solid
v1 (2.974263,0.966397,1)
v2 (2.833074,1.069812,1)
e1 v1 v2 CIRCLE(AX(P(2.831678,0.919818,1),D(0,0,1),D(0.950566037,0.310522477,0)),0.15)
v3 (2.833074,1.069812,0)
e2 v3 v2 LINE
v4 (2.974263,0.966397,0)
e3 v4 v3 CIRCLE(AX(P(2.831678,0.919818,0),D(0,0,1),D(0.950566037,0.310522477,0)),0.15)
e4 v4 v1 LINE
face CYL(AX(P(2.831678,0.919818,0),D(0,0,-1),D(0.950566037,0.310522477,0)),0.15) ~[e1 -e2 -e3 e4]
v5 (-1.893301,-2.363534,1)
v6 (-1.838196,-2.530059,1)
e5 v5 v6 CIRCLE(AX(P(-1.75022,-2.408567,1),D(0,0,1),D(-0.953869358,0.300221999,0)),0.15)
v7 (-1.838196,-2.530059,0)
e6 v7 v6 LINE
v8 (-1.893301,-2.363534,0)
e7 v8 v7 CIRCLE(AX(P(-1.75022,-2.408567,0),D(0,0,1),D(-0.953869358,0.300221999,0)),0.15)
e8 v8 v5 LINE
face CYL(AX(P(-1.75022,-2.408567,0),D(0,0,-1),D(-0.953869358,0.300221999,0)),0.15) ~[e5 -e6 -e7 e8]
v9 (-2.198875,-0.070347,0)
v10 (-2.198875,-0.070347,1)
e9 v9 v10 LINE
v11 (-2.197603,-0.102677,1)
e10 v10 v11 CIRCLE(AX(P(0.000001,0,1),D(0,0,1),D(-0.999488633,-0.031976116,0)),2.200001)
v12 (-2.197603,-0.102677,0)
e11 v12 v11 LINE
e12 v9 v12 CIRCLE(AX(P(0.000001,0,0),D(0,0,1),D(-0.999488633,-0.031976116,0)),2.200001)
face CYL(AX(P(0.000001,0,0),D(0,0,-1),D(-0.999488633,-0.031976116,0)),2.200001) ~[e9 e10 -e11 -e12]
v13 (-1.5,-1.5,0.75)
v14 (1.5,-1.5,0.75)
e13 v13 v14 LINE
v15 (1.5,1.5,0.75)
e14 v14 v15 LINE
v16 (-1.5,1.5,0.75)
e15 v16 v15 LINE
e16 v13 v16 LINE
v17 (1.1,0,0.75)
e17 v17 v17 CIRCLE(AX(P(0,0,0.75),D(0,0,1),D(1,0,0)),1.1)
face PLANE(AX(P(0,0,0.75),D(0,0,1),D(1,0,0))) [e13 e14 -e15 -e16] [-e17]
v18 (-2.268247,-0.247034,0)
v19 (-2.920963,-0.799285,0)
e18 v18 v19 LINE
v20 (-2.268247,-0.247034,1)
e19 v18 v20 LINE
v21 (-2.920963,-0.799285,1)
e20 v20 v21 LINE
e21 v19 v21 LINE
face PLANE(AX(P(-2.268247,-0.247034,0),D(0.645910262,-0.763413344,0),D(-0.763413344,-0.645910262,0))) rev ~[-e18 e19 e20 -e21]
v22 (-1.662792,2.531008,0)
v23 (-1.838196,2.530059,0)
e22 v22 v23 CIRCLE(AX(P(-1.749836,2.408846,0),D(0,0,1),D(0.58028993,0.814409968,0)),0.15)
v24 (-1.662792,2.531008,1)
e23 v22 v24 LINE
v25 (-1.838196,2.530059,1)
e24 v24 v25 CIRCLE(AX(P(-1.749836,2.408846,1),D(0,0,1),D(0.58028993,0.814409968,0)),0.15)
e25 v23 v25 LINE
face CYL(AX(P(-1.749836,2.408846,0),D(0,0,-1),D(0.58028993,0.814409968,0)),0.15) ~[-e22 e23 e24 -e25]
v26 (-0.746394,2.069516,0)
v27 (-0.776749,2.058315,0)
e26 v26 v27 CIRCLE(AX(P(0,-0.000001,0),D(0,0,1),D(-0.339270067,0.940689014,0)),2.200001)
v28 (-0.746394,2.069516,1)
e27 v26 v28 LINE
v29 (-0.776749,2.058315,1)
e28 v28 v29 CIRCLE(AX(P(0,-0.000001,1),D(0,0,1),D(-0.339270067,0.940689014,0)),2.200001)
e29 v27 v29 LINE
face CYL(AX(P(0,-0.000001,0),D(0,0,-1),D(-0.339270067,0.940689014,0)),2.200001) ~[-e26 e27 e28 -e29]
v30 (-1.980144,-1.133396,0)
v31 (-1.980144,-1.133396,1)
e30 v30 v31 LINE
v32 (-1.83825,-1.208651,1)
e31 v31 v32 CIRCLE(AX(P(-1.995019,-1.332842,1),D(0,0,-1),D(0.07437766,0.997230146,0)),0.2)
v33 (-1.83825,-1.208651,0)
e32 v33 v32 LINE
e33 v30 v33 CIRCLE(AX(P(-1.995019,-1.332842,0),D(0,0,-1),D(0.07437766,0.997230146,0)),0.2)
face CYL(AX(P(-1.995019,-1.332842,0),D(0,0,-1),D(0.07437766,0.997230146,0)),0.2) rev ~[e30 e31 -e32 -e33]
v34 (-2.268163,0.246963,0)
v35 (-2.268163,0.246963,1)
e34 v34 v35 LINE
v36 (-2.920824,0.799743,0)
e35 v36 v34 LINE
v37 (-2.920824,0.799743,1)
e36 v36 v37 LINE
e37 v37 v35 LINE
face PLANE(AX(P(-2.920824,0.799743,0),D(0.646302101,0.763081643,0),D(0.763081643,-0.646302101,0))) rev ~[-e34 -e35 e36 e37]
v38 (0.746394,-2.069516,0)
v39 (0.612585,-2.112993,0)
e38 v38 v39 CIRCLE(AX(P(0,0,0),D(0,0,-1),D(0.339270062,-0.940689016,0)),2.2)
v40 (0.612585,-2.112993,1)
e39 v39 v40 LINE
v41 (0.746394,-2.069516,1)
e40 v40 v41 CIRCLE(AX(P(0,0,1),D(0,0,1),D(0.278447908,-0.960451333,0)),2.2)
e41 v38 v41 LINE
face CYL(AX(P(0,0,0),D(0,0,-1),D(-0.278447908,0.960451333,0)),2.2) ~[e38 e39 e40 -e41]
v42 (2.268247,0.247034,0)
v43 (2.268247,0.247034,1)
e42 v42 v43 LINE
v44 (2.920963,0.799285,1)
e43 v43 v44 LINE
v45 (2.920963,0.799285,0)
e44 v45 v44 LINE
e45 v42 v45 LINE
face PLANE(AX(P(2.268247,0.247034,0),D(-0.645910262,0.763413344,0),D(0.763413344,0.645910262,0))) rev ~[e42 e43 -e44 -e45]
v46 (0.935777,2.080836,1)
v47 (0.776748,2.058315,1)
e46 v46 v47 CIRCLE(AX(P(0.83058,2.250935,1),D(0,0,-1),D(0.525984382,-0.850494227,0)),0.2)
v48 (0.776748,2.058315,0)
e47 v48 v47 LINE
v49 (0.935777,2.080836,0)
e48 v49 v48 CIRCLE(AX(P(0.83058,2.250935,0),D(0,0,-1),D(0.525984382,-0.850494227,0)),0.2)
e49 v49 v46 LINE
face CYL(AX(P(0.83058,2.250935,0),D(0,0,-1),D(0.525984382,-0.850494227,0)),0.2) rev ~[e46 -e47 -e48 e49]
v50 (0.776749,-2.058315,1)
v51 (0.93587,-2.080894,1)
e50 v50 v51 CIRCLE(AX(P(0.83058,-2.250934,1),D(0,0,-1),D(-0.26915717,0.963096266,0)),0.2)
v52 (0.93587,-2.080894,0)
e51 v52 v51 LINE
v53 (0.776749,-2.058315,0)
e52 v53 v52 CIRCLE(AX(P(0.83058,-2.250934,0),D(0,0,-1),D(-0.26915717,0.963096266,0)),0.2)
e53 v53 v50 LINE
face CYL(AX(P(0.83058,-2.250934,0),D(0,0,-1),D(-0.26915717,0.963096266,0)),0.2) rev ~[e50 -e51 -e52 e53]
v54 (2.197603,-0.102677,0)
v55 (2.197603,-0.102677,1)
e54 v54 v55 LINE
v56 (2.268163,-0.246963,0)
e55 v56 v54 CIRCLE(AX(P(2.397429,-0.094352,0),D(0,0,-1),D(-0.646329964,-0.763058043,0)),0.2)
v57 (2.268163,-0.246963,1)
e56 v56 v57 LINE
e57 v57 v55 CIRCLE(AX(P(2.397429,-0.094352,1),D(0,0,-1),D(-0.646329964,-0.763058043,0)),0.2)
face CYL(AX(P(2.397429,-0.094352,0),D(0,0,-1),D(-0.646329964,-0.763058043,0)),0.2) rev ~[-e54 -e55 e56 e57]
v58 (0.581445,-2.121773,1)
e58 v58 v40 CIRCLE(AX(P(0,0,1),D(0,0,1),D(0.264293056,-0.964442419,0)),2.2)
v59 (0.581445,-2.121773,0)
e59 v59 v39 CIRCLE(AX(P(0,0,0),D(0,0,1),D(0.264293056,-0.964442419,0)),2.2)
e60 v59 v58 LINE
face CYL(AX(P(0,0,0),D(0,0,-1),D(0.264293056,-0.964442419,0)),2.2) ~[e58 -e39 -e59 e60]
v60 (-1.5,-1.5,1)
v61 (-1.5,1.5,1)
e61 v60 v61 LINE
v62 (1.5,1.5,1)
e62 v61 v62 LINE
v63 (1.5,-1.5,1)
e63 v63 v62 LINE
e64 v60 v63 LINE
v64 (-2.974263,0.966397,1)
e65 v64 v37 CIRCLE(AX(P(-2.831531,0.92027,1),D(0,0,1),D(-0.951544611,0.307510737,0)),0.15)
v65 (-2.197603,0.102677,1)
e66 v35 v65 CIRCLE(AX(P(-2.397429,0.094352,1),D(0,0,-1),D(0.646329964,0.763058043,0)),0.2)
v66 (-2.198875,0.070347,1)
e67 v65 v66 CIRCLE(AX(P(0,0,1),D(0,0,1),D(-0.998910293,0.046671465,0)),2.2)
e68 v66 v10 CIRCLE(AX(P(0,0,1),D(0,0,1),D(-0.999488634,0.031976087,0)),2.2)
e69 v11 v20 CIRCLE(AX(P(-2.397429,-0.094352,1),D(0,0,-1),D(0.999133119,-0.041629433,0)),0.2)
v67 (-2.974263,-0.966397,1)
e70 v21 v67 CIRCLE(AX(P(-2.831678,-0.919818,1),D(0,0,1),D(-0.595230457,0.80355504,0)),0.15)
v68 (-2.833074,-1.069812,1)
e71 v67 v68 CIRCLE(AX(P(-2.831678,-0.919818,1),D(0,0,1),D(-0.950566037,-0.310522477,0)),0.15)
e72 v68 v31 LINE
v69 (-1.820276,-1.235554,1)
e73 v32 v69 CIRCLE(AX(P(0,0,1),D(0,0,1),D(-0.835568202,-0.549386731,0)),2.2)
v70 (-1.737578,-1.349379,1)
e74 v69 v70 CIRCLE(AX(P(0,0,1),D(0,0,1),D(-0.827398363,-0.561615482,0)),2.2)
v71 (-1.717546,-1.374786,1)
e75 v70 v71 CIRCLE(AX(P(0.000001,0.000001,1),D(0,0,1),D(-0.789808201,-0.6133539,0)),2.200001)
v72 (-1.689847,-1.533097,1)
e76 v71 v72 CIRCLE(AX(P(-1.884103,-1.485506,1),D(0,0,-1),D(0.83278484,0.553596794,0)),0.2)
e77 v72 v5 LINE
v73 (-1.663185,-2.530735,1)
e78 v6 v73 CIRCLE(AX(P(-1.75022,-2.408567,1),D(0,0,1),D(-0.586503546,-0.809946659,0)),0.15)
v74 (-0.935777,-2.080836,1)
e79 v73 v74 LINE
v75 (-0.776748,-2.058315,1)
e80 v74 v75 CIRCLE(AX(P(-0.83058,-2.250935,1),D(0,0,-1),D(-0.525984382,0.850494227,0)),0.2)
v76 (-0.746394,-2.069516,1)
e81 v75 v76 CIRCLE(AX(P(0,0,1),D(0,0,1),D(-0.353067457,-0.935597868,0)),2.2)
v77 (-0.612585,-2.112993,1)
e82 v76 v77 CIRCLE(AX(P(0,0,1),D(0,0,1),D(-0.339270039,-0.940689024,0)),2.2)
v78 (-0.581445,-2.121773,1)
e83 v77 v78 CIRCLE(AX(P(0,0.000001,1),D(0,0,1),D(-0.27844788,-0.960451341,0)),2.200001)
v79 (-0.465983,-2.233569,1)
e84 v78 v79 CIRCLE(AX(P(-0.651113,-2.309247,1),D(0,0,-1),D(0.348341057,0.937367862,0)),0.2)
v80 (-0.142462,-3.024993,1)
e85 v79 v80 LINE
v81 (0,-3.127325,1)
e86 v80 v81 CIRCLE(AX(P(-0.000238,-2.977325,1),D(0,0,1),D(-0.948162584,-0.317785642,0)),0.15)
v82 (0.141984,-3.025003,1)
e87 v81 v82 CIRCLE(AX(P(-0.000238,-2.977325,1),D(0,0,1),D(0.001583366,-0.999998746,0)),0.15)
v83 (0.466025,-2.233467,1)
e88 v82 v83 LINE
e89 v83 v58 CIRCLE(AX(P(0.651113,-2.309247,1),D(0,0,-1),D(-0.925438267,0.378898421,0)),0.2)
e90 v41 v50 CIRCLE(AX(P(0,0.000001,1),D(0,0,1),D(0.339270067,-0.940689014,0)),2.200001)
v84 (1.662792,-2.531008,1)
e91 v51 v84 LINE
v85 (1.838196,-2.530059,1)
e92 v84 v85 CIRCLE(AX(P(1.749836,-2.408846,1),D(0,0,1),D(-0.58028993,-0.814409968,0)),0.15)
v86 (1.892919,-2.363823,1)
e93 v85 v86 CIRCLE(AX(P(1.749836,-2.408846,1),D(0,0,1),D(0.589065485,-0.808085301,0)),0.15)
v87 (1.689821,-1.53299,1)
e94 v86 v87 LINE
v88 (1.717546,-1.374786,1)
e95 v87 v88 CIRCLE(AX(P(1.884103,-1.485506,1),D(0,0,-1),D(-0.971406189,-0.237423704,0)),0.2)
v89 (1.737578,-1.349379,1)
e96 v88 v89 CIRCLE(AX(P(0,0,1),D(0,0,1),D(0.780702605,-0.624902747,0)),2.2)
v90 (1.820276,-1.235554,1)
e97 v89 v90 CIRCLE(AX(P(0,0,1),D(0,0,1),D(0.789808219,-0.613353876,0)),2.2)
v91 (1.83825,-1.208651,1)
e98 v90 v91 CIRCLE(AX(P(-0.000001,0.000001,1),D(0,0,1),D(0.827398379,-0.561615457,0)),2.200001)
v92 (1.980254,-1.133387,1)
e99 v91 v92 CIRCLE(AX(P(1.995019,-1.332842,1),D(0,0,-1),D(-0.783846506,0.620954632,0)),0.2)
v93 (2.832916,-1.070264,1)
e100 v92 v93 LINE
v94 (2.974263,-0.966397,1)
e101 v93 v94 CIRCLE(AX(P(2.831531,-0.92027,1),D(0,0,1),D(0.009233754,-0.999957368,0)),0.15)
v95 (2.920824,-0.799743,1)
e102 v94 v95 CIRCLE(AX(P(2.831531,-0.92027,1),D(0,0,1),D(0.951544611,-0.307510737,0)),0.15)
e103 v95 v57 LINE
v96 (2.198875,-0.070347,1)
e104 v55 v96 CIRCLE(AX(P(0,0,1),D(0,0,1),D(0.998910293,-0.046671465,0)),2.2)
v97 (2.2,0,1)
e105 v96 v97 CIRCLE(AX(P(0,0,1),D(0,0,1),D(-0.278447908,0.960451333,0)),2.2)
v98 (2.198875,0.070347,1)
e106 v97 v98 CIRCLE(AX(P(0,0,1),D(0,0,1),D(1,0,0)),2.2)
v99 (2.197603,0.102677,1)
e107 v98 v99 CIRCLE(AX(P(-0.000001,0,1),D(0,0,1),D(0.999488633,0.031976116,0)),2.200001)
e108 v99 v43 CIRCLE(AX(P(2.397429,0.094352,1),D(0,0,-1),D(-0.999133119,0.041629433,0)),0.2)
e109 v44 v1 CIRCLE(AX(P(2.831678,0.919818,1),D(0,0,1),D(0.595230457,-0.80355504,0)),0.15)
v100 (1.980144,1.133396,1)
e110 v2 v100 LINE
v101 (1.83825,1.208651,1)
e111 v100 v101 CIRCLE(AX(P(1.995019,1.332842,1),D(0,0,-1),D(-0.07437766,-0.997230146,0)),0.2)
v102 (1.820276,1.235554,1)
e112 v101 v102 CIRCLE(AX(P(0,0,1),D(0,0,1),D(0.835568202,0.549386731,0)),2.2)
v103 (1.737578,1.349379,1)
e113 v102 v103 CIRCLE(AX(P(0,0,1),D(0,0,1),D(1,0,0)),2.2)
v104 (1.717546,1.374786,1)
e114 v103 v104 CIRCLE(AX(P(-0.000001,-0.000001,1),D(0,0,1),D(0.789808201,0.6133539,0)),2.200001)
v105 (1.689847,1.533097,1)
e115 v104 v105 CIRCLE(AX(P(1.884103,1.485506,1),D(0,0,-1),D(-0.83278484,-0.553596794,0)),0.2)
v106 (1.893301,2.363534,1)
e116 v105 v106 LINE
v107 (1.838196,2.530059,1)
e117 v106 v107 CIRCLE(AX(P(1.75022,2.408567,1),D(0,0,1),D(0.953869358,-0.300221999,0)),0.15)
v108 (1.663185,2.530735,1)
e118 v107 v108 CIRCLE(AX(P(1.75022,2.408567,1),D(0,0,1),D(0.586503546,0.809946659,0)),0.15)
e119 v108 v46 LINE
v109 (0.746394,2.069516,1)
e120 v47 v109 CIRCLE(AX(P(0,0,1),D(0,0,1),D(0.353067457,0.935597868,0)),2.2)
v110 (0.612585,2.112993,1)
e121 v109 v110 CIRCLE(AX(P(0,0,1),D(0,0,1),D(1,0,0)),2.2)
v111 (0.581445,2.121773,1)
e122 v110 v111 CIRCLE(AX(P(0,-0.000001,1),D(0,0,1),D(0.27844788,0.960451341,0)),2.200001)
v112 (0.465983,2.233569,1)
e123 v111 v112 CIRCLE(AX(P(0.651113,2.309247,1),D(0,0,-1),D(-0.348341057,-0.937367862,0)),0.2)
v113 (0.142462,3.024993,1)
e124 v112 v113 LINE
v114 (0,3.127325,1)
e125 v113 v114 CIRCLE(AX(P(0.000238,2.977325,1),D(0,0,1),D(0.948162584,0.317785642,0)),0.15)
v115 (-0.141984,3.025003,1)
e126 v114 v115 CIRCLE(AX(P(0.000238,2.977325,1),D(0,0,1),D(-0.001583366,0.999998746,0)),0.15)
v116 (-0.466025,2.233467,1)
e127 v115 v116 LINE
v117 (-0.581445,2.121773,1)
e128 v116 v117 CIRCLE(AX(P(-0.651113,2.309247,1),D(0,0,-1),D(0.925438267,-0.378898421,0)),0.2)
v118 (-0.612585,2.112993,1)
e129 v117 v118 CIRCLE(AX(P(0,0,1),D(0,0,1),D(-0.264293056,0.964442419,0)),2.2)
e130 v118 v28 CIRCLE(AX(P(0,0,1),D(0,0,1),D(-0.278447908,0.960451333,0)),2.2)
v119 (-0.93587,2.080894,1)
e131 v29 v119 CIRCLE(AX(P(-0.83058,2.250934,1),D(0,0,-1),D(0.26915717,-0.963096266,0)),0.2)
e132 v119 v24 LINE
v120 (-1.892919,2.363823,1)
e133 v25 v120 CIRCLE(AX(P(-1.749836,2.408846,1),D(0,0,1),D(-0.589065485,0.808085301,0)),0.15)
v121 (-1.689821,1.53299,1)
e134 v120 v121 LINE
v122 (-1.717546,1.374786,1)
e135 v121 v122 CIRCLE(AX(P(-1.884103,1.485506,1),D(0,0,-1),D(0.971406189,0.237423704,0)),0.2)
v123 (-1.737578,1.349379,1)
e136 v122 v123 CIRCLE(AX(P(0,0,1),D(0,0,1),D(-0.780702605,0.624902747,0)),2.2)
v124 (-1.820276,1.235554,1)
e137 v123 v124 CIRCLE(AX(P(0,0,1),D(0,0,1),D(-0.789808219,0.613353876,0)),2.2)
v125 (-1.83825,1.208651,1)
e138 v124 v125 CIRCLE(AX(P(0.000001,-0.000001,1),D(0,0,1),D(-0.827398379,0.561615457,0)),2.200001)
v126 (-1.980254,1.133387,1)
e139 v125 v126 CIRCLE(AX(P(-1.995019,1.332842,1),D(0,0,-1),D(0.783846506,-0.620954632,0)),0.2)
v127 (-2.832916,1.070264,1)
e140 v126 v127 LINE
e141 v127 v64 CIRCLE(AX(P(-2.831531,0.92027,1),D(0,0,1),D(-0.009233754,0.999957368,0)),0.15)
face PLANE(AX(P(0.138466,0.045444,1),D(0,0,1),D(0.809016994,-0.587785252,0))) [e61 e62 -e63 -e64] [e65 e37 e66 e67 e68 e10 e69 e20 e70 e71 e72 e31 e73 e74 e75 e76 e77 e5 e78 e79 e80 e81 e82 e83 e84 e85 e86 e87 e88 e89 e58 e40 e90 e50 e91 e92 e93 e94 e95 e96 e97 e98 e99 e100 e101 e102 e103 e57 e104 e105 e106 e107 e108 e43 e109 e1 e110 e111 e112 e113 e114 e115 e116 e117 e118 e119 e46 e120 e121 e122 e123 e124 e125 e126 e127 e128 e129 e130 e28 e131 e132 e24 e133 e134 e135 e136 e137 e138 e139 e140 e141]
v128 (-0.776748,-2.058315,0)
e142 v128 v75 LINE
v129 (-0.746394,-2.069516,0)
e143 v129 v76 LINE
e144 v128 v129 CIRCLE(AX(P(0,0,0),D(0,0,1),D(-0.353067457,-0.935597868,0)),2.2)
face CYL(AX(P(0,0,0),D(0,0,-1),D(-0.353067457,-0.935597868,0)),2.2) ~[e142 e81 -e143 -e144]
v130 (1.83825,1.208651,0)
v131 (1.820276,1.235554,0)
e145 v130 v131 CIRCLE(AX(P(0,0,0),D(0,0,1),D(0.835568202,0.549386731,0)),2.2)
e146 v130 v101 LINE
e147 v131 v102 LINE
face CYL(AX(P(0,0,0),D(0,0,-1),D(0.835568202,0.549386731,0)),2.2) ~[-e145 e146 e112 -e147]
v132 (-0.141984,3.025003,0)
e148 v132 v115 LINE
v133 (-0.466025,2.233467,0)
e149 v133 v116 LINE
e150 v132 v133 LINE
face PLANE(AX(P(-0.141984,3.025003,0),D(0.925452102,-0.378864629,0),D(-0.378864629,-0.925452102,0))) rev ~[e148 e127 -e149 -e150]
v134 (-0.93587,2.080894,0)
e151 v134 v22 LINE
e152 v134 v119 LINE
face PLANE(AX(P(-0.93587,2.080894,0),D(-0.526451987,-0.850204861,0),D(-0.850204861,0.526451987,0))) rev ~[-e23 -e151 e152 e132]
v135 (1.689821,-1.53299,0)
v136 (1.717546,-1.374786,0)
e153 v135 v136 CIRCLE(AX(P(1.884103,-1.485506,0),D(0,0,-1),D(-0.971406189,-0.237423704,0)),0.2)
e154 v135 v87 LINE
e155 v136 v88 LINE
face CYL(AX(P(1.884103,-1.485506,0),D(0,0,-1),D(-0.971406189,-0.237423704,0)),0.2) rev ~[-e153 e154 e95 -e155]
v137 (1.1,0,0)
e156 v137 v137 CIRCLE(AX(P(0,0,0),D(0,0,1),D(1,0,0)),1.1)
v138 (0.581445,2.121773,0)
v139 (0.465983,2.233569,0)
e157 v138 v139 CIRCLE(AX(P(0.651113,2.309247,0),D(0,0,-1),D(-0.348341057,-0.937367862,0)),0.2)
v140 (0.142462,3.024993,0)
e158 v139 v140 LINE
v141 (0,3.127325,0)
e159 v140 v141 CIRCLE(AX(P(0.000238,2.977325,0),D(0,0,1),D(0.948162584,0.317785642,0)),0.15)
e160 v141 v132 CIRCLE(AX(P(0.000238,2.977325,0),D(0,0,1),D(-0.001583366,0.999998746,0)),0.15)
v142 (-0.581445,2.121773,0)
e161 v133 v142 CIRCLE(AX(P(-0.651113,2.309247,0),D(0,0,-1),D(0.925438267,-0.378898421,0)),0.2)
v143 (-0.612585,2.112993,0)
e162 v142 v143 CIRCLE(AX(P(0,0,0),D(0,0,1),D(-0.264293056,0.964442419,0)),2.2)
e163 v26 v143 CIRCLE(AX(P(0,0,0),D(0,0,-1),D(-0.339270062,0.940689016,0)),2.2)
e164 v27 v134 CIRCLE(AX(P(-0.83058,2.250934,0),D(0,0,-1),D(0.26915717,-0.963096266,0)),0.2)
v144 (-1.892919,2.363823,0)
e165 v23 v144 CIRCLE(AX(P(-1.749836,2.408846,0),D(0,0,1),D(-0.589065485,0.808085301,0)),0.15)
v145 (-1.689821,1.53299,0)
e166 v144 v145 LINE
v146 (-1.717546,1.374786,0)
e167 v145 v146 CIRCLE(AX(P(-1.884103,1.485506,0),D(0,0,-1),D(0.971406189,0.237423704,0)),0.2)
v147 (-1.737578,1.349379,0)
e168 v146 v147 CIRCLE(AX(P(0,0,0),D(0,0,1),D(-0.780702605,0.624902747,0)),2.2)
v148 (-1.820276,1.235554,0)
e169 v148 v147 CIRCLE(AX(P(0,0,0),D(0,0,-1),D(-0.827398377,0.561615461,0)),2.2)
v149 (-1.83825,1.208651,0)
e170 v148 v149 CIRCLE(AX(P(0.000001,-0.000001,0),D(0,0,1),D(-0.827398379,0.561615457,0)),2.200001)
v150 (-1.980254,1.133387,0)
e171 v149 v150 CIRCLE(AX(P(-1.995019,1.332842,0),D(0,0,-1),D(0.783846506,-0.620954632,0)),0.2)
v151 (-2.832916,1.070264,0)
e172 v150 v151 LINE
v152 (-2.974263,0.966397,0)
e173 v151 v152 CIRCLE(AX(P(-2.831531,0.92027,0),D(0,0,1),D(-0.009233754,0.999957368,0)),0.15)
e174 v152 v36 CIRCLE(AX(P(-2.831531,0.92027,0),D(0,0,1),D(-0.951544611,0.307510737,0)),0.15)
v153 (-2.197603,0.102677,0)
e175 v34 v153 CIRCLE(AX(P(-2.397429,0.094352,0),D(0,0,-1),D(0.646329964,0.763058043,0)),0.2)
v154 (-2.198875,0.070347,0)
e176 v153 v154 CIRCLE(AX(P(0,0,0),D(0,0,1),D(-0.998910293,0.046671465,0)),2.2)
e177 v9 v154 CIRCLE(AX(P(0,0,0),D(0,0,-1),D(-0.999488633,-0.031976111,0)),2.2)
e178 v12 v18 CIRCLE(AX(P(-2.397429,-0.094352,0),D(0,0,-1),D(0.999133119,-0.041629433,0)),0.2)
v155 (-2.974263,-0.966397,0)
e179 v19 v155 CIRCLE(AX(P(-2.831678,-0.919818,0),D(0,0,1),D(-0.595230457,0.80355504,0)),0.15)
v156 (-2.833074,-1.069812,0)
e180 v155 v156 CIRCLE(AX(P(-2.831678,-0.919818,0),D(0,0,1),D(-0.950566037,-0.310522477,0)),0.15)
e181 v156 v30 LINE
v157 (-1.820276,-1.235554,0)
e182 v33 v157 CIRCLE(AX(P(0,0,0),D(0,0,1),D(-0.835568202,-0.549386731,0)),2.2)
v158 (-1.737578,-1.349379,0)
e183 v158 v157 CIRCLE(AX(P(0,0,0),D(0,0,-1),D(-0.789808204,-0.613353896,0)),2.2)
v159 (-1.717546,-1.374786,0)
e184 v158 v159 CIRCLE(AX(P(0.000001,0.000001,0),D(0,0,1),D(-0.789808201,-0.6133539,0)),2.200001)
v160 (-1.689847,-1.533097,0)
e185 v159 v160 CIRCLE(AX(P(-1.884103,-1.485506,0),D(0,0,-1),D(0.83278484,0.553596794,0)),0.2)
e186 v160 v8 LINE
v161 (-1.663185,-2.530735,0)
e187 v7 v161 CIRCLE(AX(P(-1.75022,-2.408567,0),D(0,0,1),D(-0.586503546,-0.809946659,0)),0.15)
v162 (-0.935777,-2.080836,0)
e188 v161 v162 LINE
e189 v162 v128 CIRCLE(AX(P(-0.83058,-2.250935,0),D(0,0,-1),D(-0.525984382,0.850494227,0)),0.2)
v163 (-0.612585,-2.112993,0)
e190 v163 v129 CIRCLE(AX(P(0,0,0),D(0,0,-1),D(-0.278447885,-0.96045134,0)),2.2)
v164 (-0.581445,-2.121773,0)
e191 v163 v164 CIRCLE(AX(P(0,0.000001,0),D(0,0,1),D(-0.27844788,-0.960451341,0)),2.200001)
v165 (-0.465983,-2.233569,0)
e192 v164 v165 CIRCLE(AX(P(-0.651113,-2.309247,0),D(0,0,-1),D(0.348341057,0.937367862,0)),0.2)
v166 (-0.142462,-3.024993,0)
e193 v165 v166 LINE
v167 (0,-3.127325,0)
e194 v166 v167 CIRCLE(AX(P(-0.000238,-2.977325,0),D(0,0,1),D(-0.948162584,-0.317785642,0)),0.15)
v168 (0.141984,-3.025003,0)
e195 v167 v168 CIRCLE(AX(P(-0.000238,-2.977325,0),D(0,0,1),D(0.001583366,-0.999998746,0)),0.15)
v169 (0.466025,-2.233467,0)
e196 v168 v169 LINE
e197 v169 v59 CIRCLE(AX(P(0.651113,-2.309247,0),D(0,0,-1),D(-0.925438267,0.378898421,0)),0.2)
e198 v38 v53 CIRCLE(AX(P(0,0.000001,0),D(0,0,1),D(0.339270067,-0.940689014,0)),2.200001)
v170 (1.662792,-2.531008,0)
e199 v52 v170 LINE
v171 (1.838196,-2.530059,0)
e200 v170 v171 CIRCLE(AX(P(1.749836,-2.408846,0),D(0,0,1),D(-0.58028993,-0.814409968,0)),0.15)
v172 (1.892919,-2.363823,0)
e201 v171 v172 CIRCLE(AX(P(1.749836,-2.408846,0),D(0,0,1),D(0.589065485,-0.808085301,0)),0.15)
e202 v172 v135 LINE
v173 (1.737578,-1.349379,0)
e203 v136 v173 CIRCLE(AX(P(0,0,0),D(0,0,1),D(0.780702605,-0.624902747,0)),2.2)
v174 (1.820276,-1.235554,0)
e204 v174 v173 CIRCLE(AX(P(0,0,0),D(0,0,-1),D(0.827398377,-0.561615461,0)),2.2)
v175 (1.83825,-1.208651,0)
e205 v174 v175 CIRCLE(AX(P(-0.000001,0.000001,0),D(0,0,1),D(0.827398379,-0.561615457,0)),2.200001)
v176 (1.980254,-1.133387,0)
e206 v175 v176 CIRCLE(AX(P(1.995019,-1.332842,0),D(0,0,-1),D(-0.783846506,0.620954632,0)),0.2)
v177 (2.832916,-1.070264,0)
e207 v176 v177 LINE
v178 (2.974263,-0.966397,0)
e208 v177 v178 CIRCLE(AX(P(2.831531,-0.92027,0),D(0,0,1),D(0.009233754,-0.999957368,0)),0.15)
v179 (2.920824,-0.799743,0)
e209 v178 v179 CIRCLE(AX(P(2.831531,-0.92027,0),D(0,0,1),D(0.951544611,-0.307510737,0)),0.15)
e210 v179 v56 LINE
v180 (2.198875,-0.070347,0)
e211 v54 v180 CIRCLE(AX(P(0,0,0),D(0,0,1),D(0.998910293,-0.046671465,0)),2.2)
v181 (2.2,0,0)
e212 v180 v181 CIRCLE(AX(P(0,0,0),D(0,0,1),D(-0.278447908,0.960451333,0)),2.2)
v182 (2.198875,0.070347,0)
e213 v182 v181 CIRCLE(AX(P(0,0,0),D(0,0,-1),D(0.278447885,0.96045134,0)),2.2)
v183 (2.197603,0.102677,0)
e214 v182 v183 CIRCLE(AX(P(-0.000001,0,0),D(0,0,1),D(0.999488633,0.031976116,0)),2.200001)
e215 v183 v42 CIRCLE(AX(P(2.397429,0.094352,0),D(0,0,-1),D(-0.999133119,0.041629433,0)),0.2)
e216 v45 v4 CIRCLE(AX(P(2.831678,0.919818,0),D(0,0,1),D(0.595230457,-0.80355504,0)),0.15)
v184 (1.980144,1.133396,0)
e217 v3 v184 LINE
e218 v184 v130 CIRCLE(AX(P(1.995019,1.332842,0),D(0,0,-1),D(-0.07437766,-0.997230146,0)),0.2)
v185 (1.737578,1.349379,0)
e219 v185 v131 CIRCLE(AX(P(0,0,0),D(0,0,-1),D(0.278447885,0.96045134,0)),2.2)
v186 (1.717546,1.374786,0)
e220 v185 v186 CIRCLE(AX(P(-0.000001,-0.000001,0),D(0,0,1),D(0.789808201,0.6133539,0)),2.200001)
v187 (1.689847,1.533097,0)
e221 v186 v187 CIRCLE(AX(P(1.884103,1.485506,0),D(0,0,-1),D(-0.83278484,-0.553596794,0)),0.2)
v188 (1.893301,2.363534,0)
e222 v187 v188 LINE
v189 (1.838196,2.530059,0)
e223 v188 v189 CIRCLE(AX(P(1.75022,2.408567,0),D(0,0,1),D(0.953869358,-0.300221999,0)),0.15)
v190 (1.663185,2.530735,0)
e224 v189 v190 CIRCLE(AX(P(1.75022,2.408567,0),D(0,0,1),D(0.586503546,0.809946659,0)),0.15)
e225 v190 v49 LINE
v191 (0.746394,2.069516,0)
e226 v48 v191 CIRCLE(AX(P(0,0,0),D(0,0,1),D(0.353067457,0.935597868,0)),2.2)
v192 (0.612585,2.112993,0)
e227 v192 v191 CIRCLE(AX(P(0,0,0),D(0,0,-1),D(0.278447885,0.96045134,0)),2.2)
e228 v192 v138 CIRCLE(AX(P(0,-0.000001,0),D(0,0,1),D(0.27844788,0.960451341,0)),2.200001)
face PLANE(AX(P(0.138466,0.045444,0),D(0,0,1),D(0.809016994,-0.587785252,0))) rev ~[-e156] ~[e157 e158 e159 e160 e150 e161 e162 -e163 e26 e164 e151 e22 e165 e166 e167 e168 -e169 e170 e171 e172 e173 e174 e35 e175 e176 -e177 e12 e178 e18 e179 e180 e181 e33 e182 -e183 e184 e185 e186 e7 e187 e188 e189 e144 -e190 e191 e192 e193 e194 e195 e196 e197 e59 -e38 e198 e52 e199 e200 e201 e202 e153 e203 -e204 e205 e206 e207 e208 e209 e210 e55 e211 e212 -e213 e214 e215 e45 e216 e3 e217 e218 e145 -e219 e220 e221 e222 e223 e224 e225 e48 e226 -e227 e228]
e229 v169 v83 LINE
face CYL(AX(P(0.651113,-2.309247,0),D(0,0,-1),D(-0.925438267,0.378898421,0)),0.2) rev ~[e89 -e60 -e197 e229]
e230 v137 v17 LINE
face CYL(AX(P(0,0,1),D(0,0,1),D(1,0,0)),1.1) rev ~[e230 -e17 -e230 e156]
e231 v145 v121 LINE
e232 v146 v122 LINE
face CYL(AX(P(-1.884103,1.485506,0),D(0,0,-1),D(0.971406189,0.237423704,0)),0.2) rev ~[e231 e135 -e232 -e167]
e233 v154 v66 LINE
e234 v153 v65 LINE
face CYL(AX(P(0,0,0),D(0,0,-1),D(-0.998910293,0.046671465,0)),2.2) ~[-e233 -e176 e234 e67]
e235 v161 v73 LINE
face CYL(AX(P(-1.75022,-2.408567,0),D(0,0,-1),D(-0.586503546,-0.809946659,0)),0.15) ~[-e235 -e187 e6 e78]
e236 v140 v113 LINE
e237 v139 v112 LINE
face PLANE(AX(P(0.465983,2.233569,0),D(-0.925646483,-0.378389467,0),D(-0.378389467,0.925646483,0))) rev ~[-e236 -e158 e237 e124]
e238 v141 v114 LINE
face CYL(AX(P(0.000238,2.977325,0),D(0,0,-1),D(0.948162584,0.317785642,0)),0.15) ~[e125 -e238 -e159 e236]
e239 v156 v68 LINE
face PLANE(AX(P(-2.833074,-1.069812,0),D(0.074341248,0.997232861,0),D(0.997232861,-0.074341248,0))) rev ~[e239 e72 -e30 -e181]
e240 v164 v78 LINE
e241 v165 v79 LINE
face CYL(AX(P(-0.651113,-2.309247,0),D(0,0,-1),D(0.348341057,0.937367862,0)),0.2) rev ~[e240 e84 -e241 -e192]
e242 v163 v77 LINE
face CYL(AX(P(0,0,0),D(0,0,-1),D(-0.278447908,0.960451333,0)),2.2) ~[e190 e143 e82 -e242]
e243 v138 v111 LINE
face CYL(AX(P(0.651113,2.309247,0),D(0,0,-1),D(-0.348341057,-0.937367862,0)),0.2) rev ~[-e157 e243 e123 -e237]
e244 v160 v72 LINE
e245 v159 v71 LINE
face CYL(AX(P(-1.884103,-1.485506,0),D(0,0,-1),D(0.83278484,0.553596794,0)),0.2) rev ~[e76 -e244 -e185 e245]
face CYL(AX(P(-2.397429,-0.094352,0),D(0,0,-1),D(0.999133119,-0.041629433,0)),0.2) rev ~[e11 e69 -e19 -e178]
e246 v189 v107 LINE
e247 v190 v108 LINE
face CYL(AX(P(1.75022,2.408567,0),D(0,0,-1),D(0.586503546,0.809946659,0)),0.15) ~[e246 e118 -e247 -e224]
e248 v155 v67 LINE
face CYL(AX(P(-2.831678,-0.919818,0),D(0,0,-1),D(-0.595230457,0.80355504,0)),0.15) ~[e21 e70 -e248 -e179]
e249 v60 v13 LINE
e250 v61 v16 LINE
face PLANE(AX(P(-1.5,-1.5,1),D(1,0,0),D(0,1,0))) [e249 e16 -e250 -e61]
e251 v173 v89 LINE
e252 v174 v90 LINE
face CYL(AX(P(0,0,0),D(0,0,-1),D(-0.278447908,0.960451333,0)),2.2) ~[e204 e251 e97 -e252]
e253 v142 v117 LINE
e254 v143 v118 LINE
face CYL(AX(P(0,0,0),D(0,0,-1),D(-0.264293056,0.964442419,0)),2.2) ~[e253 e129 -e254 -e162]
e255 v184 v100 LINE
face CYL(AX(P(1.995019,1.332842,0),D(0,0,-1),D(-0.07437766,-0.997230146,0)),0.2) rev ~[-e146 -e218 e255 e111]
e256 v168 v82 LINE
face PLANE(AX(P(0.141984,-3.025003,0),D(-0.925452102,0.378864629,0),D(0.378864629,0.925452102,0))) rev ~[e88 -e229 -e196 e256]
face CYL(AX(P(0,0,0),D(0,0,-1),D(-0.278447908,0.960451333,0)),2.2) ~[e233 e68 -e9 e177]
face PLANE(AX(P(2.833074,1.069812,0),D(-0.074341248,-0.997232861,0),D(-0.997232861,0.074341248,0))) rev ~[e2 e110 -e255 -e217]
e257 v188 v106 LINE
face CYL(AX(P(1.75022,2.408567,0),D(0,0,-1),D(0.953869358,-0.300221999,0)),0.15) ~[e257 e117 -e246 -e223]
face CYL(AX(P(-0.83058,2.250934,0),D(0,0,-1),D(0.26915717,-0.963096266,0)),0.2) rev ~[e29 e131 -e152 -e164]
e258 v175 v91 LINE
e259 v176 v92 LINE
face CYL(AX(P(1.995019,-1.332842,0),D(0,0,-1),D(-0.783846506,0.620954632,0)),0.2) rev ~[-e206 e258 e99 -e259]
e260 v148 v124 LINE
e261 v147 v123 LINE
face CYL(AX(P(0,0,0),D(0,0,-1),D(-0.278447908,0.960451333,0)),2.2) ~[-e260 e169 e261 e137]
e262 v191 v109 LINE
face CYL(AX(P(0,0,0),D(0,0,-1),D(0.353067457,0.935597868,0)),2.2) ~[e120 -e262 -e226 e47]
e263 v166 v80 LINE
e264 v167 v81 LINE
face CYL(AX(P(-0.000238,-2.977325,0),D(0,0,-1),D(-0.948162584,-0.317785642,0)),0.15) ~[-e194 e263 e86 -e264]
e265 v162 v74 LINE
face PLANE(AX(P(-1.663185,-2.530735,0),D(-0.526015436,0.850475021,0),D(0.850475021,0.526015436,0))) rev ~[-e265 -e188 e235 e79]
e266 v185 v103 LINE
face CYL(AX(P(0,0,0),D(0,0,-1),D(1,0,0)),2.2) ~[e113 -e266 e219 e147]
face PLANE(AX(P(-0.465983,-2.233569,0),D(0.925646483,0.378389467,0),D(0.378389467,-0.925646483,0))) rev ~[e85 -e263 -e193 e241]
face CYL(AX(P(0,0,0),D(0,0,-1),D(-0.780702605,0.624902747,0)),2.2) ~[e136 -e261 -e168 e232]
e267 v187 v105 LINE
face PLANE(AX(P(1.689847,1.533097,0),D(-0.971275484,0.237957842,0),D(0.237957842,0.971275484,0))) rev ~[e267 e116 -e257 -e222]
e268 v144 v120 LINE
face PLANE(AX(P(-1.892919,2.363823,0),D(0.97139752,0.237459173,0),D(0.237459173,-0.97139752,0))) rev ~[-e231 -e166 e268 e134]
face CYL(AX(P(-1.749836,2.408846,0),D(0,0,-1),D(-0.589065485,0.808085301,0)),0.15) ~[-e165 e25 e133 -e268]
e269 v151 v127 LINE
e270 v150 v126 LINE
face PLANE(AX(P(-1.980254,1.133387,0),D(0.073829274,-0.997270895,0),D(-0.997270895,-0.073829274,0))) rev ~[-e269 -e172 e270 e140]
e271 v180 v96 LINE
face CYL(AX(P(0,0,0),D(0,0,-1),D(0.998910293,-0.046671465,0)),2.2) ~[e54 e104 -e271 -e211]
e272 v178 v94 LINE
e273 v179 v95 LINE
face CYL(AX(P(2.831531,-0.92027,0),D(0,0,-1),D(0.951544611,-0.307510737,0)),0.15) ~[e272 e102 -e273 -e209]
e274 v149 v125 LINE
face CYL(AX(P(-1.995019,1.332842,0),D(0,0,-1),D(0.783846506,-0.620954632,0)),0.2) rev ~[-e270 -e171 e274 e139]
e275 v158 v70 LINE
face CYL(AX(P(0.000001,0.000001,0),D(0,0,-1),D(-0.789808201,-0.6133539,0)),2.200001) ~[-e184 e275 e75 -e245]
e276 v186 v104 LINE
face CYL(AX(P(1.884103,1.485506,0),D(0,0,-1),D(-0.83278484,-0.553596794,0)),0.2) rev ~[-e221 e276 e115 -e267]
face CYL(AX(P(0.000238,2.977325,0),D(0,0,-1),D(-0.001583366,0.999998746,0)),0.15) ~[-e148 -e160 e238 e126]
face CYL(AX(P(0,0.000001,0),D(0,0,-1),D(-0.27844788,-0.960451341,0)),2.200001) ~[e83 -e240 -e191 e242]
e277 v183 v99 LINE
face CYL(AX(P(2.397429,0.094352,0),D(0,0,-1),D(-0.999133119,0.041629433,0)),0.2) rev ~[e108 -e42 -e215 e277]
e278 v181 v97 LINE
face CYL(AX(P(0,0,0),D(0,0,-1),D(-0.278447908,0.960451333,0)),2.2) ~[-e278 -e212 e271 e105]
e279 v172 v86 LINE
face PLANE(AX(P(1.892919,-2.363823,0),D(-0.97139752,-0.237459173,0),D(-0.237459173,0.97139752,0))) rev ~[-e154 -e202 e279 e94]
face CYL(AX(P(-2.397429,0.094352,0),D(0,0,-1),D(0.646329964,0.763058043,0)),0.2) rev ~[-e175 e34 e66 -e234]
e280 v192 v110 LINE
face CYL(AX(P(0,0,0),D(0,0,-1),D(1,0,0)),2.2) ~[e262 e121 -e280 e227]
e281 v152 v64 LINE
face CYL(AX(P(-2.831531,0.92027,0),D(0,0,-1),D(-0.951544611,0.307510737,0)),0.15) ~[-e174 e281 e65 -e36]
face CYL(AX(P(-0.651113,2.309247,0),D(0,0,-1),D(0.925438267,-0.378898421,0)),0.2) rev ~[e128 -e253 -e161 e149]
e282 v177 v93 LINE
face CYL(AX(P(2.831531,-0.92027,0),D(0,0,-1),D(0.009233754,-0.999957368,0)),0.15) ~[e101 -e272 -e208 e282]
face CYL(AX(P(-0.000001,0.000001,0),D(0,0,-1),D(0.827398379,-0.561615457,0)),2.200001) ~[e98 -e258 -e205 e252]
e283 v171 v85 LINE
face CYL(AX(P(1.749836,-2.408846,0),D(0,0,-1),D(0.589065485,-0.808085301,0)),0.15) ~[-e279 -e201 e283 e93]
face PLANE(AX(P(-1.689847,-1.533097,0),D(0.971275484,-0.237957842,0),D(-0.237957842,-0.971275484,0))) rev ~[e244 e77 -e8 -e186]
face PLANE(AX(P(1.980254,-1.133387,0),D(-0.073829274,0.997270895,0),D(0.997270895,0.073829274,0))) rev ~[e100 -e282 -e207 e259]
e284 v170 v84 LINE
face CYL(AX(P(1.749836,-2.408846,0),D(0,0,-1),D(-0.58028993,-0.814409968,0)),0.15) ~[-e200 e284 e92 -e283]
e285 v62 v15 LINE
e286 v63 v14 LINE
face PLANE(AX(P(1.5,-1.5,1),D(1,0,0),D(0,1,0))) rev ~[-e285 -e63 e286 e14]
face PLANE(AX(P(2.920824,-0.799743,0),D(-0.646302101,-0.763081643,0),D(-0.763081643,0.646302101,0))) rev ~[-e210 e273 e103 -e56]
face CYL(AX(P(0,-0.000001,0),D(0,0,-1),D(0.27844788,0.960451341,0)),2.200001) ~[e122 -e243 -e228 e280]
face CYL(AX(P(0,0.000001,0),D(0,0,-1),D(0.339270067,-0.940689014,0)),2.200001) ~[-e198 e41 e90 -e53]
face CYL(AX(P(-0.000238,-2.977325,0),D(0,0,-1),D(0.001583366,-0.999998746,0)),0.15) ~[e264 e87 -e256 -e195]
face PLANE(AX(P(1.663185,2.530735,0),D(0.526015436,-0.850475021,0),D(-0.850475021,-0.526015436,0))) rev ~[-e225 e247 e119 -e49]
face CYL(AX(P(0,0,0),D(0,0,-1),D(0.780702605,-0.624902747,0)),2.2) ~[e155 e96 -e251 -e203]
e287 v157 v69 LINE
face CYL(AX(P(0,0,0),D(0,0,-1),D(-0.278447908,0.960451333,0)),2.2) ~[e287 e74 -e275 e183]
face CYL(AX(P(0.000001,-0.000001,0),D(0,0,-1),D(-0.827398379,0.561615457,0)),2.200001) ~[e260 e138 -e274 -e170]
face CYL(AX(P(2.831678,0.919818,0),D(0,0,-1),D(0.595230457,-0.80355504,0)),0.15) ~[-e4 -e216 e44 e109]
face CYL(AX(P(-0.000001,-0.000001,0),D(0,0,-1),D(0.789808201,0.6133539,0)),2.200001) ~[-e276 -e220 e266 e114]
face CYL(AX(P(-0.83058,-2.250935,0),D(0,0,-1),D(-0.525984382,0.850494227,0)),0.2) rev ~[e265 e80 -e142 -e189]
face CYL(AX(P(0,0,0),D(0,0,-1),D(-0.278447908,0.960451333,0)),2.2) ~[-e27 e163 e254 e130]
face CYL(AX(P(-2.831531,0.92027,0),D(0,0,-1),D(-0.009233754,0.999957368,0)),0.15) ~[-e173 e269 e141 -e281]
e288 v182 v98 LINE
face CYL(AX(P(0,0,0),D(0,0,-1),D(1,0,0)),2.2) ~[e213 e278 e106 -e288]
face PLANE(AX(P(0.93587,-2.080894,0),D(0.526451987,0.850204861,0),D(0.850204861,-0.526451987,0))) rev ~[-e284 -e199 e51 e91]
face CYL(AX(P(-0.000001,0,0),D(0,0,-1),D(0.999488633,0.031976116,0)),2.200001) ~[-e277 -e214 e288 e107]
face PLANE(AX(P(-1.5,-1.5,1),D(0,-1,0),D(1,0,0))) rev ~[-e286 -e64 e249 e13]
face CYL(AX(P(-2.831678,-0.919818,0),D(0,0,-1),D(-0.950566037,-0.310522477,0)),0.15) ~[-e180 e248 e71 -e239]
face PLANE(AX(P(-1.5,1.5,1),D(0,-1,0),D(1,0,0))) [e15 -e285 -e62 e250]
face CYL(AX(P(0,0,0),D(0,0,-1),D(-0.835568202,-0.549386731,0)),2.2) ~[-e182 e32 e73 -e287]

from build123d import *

# Parameters (mm, degrees)
F1_DEPTH        = 1
F1_COPIES_COUNT = 10
F3_W            = 3
F3_H            = 3
F4_DEPTH        = 0.25
F5_DEPTH        = 1
F6_DEPTH        = 0.25
F7_R            = 1.1
F8_DEPTH        = 1.31


# Not quite as in the source:
# - ends of sketch curves that miss each other by under 0.0002 mm in the source are joined
# - a feature of the source that left no trace in its solid (it failed there, or was rolled back) is left out
# - a pattern or mirror of a feature is missing from the dataset's text; its kind, count and spacing are read off the source's solid


with BuildPart() as f1:
    # F0 (on Top) → F1 (new body)
    with BuildSketch(Plane.XY):
        with BuildLine():
            ThreePointArc((0.581444512, 2.1217733808), (0.2933415776, 2.1803556405), (0, 2.2))
            ThreePointArc((0, 2.2), (-0.2933416878, 2.1803556256), (-0.5814447265, 2.121773322))
            ThreePointArc((-0.5814447265, 2.121773322), (-0.5968372157, 2.1167523736), (-0.6125853979, 2.1129929319))
            ThreePointArc((-0.6125853979, 2.1129929319), (-1.3214219849, -1.7589326132), (2.2, 0))
            ThreePointArc((2.2, 0), (1.7589325969, 1.3214220066), (0.612585346, 2.112992947))
            ThreePointArc((0.6125853416, 2.1129929319), (0.5968370782, 2.1167523965), (0.581444512, 2.1217733808))
        make_face()
        with BuildLine():
            ThreePointArc((0.6, 0.8), (0, -1), (-0.6, 0.8))
            Line((-0.6, 0.8), (0, 0.8))
            Line((0, 0.8), (0.6, 0.8))
        make_face(mode=Mode.SUBTRACT)
        with BuildLine():
            ThreePointArc((-0.5814447265, 2.121773322), (-0.2933416878, 2.1803556256), (0, 2.2))
            Line((0, 2.2), (0, 2.8273255734))
            ThreePointArc((0, 2.8273255734), (-0.1215931939, 2.889819495), (-0.1419835484, 3.0250031792))
            Line((-0.1419835484, 3.0250031792), (-0.4660251262, 2.233467269))
            ThreePointArc((-0.4660251262, 2.233467269), (-0.5120300634, 2.1655250062), (-0.5814447265, 2.121773322))
        make_face()
        with BuildLine():
            Line((0, 2.8273255734), (0, 2.2))
            ThreePointArc((0, 2.2), (0.2933415776, 2.1803556405), (0.581444512, 2.1217733808))
            ThreePointArc((0.581444512, 2.1217733808), (0.5119904355, 2.165563311), (0.4659834267, 2.2335690598))
            Line((0.4659834267, 2.2335690598), (0.1424618925, 3.0249932315))
            ThreePointArc((0.1424618925, 3.0249932315), (0.1482808399, 3.0014743175), (0.1502375048, 2.9773253853))
            ThreePointArc((0.1502375048, 2.9773253853), (0.1062195181, 2.8711754307), (0, 2.8273255734))
        make_face()
        with BuildLine():
            ThreePointArc((-0.1419835484, 3.0250031792), (-0.1215931939, 2.889819495), (0, 2.8273255734))
            Line((0, 2.8273255734), (0, 3.1273251973))
            ThreePointArc((0, 3.1273251973), (-0.0874611784, 3.0990173775), (-0.1419835484, 3.0250031792))
        make_face()
        with BuildLine():
            Line((0, 3.1273251973), (0, 2.8273255734))
            ThreePointArc((0, 2.8273255734), (0.1062195181, 2.8711754307), (0.1502375048, 2.9773253853))
            ThreePointArc((0.1502375048, 2.9773253853), (0.1482808399, 3.0014743175), (0.1424618925, 3.0249932315))
            ThreePointArc((0.1424618925, 3.0249932315), (0.0877476558, 3.0991530237), (0, 3.1273251973))
        make_face()
        with BuildLine():
            ThreePointArc((0.612585346, 2.112992947), (0.5970310708, 2.1174404125), (0.581444512, 2.1217733808))
            ThreePointArc((0.581444512, 2.1217733808), (0.5968370782, 2.1167523965), (0.6125853416, 2.1129929319))
        make_face()
        with BuildLine():
            ThreePointArc((-0.6125853979, 2.1129929319), (-0.5968372157, 2.1167523736), (-0.5814447265, 2.121773322))
            ThreePointArc((-0.5814447265, 2.121773322), (-0.5970312038, 2.117440375), (-0.6125853979, 2.1129929319))
        make_face()
    extrude(amount=F1_DEPTH)

    # F1_copies: F1 ×10 about axis
    f1_copies_axis = Axis((0, 0, 0), (0, 0, 1))


with BuildPart() as f1_1:
    add(f1.part)
    for i in range(1, F1_COPIES_COUNT):
        add(f1.part.rotate(f1_copies_axis, i * 360 / F1_COPIES_COUNT))

    # F3 (on face) → F4 (cut)
    with BuildSketch(Plane.XY.offset(1)):
        Rectangle(F3_W, F3_H)
    extrude(amount=-F4_DEPTH, mode=Mode.SUBTRACT)

    # F0 (on Top) → F5 (join)
    with BuildSketch(Plane.XY):
        with BuildLine():
            ThreePointArc((0.581444512, 2.1217733808), (0.2933415776, 2.1803556405), (0, 2.2))
            ThreePointArc((0, 2.2), (-0.2933416878, 2.1803556256), (-0.5814447265, 2.121773322))
            ThreePointArc((-0.5814447265, 2.121773322), (-0.5968372157, 2.1167523736), (-0.6125853979, 2.1129929319))
            ThreePointArc((-0.6125853979, 2.1129929319), (-1.3214219849, -1.7589326132), (2.2, 0))
            ThreePointArc((2.2, 0), (1.7589325969, 1.3214220066), (0.612585346, 2.112992947))
            ThreePointArc((0.6125853416, 2.1129929319), (0.5968370782, 2.1167523965), (0.581444512, 2.1217733808))
        make_face()
        with BuildLine():
            ThreePointArc((0.6, 0.8), (0, -1), (-0.6, 0.8))
            Line((-0.6, 0.8), (0, 0.8))
            Line((0, 0.8), (0.6, 0.8))
        make_face(mode=Mode.SUBTRACT)
        with BuildLine():
            ThreePointArc((-0.5814447265, 2.121773322), (-0.2933416878, 2.1803556256), (0, 2.2))
            Line((0, 2.2), (0, 2.8273255734))
            ThreePointArc((0, 2.8273255734), (-0.1215931939, 2.889819495), (-0.1419835484, 3.0250031792))
            Line((-0.1419835484, 3.0250031792), (-0.4660251262, 2.233467269))
            ThreePointArc((-0.4660251262, 2.233467269), (-0.5120300634, 2.1655250062), (-0.5814447265, 2.121773322))
        make_face()
        with BuildLine():
            Line((0, 2.8273255734), (0, 2.2))
            ThreePointArc((0, 2.2), (0.2933415776, 2.1803556405), (0.581444512, 2.1217733808))
            ThreePointArc((0.581444512, 2.1217733808), (0.5119904355, 2.165563311), (0.4659834267, 2.2335690598))
            Line((0.4659834267, 2.2335690598), (0.1424618925, 3.0249932315))
            ThreePointArc((0.1424618925, 3.0249932315), (0.1482808399, 3.0014743175), (0.1502375048, 2.9773253853))
            ThreePointArc((0.1502375048, 2.9773253853), (0.1062195181, 2.8711754307), (0, 2.8273255734))
        make_face()
        with BuildLine():
            ThreePointArc((-0.1419835484, 3.0250031792), (-0.1215931939, 2.889819495), (0, 2.8273255734))
            Line((0, 2.8273255734), (0, 3.1273251973))
            ThreePointArc((0, 3.1273251973), (-0.0874611784, 3.0990173775), (-0.1419835484, 3.0250031792))
        make_face()
        with BuildLine():
            Line((0, 3.1273251973), (0, 2.8273255734))
            ThreePointArc((0, 2.8273255734), (0.1062195181, 2.8711754307), (0.1502375048, 2.9773253853))
            ThreePointArc((0.1502375048, 2.9773253853), (0.1482808399, 3.0014743175), (0.1424618925, 3.0249932315))
            ThreePointArc((0.1424618925, 3.0249932315), (0.0877476558, 3.0991530237), (0, 3.1273251973))
        make_face()
        with BuildLine():
            ThreePointArc((0.612585346, 2.112992947), (0.5970310708, 2.1174404125), (0.581444512, 2.1217733808))
            ThreePointArc((0.581444512, 2.1217733808), (0.5968370782, 2.1167523965), (0.6125853416, 2.1129929319))
        make_face()
        with BuildLine():
            ThreePointArc((-0.6125853979, 2.1129929319), (-0.5968372157, 2.1167523736), (-0.5814447265, 2.121773322))
            ThreePointArc((-0.5814447265, 2.121773322), (-0.5970312038, 2.117440375), (-0.6125853979, 2.1129929319))
        make_face()
    extrude(amount=F5_DEPTH)

    # F3 (on face) → F6 (cut)
    with BuildSketch(Plane.XY.offset(1)):
        Rectangle(F3_W, F3_H)
        Polygon((-0.259935757, 0.8), (0.259935757, 0.8), (0.6805206467, 0.494427191), (0.8411697794, 0), (0.6805206467, -0.494427191), (0.259935757, -0.8), (-0.259935757, -0.8), (-0.6805206467, -0.494427191), (-0.8411697794, 0), (-0.6805206467, 0.494427191), align=None, mode=Mode.SUBTRACT)
    extrude(amount=-F6_DEPTH, mode=Mode.SUBTRACT)

    # F7 (on face) → F8 (cut, symmetric)
    with BuildSketch(Plane.XY.offset(1)):
        Circle(F7_R)
    extrude(amount=F8_DEPTH, both=True, mode=Mode.SUBTRACT)


solid = f1_1.part
